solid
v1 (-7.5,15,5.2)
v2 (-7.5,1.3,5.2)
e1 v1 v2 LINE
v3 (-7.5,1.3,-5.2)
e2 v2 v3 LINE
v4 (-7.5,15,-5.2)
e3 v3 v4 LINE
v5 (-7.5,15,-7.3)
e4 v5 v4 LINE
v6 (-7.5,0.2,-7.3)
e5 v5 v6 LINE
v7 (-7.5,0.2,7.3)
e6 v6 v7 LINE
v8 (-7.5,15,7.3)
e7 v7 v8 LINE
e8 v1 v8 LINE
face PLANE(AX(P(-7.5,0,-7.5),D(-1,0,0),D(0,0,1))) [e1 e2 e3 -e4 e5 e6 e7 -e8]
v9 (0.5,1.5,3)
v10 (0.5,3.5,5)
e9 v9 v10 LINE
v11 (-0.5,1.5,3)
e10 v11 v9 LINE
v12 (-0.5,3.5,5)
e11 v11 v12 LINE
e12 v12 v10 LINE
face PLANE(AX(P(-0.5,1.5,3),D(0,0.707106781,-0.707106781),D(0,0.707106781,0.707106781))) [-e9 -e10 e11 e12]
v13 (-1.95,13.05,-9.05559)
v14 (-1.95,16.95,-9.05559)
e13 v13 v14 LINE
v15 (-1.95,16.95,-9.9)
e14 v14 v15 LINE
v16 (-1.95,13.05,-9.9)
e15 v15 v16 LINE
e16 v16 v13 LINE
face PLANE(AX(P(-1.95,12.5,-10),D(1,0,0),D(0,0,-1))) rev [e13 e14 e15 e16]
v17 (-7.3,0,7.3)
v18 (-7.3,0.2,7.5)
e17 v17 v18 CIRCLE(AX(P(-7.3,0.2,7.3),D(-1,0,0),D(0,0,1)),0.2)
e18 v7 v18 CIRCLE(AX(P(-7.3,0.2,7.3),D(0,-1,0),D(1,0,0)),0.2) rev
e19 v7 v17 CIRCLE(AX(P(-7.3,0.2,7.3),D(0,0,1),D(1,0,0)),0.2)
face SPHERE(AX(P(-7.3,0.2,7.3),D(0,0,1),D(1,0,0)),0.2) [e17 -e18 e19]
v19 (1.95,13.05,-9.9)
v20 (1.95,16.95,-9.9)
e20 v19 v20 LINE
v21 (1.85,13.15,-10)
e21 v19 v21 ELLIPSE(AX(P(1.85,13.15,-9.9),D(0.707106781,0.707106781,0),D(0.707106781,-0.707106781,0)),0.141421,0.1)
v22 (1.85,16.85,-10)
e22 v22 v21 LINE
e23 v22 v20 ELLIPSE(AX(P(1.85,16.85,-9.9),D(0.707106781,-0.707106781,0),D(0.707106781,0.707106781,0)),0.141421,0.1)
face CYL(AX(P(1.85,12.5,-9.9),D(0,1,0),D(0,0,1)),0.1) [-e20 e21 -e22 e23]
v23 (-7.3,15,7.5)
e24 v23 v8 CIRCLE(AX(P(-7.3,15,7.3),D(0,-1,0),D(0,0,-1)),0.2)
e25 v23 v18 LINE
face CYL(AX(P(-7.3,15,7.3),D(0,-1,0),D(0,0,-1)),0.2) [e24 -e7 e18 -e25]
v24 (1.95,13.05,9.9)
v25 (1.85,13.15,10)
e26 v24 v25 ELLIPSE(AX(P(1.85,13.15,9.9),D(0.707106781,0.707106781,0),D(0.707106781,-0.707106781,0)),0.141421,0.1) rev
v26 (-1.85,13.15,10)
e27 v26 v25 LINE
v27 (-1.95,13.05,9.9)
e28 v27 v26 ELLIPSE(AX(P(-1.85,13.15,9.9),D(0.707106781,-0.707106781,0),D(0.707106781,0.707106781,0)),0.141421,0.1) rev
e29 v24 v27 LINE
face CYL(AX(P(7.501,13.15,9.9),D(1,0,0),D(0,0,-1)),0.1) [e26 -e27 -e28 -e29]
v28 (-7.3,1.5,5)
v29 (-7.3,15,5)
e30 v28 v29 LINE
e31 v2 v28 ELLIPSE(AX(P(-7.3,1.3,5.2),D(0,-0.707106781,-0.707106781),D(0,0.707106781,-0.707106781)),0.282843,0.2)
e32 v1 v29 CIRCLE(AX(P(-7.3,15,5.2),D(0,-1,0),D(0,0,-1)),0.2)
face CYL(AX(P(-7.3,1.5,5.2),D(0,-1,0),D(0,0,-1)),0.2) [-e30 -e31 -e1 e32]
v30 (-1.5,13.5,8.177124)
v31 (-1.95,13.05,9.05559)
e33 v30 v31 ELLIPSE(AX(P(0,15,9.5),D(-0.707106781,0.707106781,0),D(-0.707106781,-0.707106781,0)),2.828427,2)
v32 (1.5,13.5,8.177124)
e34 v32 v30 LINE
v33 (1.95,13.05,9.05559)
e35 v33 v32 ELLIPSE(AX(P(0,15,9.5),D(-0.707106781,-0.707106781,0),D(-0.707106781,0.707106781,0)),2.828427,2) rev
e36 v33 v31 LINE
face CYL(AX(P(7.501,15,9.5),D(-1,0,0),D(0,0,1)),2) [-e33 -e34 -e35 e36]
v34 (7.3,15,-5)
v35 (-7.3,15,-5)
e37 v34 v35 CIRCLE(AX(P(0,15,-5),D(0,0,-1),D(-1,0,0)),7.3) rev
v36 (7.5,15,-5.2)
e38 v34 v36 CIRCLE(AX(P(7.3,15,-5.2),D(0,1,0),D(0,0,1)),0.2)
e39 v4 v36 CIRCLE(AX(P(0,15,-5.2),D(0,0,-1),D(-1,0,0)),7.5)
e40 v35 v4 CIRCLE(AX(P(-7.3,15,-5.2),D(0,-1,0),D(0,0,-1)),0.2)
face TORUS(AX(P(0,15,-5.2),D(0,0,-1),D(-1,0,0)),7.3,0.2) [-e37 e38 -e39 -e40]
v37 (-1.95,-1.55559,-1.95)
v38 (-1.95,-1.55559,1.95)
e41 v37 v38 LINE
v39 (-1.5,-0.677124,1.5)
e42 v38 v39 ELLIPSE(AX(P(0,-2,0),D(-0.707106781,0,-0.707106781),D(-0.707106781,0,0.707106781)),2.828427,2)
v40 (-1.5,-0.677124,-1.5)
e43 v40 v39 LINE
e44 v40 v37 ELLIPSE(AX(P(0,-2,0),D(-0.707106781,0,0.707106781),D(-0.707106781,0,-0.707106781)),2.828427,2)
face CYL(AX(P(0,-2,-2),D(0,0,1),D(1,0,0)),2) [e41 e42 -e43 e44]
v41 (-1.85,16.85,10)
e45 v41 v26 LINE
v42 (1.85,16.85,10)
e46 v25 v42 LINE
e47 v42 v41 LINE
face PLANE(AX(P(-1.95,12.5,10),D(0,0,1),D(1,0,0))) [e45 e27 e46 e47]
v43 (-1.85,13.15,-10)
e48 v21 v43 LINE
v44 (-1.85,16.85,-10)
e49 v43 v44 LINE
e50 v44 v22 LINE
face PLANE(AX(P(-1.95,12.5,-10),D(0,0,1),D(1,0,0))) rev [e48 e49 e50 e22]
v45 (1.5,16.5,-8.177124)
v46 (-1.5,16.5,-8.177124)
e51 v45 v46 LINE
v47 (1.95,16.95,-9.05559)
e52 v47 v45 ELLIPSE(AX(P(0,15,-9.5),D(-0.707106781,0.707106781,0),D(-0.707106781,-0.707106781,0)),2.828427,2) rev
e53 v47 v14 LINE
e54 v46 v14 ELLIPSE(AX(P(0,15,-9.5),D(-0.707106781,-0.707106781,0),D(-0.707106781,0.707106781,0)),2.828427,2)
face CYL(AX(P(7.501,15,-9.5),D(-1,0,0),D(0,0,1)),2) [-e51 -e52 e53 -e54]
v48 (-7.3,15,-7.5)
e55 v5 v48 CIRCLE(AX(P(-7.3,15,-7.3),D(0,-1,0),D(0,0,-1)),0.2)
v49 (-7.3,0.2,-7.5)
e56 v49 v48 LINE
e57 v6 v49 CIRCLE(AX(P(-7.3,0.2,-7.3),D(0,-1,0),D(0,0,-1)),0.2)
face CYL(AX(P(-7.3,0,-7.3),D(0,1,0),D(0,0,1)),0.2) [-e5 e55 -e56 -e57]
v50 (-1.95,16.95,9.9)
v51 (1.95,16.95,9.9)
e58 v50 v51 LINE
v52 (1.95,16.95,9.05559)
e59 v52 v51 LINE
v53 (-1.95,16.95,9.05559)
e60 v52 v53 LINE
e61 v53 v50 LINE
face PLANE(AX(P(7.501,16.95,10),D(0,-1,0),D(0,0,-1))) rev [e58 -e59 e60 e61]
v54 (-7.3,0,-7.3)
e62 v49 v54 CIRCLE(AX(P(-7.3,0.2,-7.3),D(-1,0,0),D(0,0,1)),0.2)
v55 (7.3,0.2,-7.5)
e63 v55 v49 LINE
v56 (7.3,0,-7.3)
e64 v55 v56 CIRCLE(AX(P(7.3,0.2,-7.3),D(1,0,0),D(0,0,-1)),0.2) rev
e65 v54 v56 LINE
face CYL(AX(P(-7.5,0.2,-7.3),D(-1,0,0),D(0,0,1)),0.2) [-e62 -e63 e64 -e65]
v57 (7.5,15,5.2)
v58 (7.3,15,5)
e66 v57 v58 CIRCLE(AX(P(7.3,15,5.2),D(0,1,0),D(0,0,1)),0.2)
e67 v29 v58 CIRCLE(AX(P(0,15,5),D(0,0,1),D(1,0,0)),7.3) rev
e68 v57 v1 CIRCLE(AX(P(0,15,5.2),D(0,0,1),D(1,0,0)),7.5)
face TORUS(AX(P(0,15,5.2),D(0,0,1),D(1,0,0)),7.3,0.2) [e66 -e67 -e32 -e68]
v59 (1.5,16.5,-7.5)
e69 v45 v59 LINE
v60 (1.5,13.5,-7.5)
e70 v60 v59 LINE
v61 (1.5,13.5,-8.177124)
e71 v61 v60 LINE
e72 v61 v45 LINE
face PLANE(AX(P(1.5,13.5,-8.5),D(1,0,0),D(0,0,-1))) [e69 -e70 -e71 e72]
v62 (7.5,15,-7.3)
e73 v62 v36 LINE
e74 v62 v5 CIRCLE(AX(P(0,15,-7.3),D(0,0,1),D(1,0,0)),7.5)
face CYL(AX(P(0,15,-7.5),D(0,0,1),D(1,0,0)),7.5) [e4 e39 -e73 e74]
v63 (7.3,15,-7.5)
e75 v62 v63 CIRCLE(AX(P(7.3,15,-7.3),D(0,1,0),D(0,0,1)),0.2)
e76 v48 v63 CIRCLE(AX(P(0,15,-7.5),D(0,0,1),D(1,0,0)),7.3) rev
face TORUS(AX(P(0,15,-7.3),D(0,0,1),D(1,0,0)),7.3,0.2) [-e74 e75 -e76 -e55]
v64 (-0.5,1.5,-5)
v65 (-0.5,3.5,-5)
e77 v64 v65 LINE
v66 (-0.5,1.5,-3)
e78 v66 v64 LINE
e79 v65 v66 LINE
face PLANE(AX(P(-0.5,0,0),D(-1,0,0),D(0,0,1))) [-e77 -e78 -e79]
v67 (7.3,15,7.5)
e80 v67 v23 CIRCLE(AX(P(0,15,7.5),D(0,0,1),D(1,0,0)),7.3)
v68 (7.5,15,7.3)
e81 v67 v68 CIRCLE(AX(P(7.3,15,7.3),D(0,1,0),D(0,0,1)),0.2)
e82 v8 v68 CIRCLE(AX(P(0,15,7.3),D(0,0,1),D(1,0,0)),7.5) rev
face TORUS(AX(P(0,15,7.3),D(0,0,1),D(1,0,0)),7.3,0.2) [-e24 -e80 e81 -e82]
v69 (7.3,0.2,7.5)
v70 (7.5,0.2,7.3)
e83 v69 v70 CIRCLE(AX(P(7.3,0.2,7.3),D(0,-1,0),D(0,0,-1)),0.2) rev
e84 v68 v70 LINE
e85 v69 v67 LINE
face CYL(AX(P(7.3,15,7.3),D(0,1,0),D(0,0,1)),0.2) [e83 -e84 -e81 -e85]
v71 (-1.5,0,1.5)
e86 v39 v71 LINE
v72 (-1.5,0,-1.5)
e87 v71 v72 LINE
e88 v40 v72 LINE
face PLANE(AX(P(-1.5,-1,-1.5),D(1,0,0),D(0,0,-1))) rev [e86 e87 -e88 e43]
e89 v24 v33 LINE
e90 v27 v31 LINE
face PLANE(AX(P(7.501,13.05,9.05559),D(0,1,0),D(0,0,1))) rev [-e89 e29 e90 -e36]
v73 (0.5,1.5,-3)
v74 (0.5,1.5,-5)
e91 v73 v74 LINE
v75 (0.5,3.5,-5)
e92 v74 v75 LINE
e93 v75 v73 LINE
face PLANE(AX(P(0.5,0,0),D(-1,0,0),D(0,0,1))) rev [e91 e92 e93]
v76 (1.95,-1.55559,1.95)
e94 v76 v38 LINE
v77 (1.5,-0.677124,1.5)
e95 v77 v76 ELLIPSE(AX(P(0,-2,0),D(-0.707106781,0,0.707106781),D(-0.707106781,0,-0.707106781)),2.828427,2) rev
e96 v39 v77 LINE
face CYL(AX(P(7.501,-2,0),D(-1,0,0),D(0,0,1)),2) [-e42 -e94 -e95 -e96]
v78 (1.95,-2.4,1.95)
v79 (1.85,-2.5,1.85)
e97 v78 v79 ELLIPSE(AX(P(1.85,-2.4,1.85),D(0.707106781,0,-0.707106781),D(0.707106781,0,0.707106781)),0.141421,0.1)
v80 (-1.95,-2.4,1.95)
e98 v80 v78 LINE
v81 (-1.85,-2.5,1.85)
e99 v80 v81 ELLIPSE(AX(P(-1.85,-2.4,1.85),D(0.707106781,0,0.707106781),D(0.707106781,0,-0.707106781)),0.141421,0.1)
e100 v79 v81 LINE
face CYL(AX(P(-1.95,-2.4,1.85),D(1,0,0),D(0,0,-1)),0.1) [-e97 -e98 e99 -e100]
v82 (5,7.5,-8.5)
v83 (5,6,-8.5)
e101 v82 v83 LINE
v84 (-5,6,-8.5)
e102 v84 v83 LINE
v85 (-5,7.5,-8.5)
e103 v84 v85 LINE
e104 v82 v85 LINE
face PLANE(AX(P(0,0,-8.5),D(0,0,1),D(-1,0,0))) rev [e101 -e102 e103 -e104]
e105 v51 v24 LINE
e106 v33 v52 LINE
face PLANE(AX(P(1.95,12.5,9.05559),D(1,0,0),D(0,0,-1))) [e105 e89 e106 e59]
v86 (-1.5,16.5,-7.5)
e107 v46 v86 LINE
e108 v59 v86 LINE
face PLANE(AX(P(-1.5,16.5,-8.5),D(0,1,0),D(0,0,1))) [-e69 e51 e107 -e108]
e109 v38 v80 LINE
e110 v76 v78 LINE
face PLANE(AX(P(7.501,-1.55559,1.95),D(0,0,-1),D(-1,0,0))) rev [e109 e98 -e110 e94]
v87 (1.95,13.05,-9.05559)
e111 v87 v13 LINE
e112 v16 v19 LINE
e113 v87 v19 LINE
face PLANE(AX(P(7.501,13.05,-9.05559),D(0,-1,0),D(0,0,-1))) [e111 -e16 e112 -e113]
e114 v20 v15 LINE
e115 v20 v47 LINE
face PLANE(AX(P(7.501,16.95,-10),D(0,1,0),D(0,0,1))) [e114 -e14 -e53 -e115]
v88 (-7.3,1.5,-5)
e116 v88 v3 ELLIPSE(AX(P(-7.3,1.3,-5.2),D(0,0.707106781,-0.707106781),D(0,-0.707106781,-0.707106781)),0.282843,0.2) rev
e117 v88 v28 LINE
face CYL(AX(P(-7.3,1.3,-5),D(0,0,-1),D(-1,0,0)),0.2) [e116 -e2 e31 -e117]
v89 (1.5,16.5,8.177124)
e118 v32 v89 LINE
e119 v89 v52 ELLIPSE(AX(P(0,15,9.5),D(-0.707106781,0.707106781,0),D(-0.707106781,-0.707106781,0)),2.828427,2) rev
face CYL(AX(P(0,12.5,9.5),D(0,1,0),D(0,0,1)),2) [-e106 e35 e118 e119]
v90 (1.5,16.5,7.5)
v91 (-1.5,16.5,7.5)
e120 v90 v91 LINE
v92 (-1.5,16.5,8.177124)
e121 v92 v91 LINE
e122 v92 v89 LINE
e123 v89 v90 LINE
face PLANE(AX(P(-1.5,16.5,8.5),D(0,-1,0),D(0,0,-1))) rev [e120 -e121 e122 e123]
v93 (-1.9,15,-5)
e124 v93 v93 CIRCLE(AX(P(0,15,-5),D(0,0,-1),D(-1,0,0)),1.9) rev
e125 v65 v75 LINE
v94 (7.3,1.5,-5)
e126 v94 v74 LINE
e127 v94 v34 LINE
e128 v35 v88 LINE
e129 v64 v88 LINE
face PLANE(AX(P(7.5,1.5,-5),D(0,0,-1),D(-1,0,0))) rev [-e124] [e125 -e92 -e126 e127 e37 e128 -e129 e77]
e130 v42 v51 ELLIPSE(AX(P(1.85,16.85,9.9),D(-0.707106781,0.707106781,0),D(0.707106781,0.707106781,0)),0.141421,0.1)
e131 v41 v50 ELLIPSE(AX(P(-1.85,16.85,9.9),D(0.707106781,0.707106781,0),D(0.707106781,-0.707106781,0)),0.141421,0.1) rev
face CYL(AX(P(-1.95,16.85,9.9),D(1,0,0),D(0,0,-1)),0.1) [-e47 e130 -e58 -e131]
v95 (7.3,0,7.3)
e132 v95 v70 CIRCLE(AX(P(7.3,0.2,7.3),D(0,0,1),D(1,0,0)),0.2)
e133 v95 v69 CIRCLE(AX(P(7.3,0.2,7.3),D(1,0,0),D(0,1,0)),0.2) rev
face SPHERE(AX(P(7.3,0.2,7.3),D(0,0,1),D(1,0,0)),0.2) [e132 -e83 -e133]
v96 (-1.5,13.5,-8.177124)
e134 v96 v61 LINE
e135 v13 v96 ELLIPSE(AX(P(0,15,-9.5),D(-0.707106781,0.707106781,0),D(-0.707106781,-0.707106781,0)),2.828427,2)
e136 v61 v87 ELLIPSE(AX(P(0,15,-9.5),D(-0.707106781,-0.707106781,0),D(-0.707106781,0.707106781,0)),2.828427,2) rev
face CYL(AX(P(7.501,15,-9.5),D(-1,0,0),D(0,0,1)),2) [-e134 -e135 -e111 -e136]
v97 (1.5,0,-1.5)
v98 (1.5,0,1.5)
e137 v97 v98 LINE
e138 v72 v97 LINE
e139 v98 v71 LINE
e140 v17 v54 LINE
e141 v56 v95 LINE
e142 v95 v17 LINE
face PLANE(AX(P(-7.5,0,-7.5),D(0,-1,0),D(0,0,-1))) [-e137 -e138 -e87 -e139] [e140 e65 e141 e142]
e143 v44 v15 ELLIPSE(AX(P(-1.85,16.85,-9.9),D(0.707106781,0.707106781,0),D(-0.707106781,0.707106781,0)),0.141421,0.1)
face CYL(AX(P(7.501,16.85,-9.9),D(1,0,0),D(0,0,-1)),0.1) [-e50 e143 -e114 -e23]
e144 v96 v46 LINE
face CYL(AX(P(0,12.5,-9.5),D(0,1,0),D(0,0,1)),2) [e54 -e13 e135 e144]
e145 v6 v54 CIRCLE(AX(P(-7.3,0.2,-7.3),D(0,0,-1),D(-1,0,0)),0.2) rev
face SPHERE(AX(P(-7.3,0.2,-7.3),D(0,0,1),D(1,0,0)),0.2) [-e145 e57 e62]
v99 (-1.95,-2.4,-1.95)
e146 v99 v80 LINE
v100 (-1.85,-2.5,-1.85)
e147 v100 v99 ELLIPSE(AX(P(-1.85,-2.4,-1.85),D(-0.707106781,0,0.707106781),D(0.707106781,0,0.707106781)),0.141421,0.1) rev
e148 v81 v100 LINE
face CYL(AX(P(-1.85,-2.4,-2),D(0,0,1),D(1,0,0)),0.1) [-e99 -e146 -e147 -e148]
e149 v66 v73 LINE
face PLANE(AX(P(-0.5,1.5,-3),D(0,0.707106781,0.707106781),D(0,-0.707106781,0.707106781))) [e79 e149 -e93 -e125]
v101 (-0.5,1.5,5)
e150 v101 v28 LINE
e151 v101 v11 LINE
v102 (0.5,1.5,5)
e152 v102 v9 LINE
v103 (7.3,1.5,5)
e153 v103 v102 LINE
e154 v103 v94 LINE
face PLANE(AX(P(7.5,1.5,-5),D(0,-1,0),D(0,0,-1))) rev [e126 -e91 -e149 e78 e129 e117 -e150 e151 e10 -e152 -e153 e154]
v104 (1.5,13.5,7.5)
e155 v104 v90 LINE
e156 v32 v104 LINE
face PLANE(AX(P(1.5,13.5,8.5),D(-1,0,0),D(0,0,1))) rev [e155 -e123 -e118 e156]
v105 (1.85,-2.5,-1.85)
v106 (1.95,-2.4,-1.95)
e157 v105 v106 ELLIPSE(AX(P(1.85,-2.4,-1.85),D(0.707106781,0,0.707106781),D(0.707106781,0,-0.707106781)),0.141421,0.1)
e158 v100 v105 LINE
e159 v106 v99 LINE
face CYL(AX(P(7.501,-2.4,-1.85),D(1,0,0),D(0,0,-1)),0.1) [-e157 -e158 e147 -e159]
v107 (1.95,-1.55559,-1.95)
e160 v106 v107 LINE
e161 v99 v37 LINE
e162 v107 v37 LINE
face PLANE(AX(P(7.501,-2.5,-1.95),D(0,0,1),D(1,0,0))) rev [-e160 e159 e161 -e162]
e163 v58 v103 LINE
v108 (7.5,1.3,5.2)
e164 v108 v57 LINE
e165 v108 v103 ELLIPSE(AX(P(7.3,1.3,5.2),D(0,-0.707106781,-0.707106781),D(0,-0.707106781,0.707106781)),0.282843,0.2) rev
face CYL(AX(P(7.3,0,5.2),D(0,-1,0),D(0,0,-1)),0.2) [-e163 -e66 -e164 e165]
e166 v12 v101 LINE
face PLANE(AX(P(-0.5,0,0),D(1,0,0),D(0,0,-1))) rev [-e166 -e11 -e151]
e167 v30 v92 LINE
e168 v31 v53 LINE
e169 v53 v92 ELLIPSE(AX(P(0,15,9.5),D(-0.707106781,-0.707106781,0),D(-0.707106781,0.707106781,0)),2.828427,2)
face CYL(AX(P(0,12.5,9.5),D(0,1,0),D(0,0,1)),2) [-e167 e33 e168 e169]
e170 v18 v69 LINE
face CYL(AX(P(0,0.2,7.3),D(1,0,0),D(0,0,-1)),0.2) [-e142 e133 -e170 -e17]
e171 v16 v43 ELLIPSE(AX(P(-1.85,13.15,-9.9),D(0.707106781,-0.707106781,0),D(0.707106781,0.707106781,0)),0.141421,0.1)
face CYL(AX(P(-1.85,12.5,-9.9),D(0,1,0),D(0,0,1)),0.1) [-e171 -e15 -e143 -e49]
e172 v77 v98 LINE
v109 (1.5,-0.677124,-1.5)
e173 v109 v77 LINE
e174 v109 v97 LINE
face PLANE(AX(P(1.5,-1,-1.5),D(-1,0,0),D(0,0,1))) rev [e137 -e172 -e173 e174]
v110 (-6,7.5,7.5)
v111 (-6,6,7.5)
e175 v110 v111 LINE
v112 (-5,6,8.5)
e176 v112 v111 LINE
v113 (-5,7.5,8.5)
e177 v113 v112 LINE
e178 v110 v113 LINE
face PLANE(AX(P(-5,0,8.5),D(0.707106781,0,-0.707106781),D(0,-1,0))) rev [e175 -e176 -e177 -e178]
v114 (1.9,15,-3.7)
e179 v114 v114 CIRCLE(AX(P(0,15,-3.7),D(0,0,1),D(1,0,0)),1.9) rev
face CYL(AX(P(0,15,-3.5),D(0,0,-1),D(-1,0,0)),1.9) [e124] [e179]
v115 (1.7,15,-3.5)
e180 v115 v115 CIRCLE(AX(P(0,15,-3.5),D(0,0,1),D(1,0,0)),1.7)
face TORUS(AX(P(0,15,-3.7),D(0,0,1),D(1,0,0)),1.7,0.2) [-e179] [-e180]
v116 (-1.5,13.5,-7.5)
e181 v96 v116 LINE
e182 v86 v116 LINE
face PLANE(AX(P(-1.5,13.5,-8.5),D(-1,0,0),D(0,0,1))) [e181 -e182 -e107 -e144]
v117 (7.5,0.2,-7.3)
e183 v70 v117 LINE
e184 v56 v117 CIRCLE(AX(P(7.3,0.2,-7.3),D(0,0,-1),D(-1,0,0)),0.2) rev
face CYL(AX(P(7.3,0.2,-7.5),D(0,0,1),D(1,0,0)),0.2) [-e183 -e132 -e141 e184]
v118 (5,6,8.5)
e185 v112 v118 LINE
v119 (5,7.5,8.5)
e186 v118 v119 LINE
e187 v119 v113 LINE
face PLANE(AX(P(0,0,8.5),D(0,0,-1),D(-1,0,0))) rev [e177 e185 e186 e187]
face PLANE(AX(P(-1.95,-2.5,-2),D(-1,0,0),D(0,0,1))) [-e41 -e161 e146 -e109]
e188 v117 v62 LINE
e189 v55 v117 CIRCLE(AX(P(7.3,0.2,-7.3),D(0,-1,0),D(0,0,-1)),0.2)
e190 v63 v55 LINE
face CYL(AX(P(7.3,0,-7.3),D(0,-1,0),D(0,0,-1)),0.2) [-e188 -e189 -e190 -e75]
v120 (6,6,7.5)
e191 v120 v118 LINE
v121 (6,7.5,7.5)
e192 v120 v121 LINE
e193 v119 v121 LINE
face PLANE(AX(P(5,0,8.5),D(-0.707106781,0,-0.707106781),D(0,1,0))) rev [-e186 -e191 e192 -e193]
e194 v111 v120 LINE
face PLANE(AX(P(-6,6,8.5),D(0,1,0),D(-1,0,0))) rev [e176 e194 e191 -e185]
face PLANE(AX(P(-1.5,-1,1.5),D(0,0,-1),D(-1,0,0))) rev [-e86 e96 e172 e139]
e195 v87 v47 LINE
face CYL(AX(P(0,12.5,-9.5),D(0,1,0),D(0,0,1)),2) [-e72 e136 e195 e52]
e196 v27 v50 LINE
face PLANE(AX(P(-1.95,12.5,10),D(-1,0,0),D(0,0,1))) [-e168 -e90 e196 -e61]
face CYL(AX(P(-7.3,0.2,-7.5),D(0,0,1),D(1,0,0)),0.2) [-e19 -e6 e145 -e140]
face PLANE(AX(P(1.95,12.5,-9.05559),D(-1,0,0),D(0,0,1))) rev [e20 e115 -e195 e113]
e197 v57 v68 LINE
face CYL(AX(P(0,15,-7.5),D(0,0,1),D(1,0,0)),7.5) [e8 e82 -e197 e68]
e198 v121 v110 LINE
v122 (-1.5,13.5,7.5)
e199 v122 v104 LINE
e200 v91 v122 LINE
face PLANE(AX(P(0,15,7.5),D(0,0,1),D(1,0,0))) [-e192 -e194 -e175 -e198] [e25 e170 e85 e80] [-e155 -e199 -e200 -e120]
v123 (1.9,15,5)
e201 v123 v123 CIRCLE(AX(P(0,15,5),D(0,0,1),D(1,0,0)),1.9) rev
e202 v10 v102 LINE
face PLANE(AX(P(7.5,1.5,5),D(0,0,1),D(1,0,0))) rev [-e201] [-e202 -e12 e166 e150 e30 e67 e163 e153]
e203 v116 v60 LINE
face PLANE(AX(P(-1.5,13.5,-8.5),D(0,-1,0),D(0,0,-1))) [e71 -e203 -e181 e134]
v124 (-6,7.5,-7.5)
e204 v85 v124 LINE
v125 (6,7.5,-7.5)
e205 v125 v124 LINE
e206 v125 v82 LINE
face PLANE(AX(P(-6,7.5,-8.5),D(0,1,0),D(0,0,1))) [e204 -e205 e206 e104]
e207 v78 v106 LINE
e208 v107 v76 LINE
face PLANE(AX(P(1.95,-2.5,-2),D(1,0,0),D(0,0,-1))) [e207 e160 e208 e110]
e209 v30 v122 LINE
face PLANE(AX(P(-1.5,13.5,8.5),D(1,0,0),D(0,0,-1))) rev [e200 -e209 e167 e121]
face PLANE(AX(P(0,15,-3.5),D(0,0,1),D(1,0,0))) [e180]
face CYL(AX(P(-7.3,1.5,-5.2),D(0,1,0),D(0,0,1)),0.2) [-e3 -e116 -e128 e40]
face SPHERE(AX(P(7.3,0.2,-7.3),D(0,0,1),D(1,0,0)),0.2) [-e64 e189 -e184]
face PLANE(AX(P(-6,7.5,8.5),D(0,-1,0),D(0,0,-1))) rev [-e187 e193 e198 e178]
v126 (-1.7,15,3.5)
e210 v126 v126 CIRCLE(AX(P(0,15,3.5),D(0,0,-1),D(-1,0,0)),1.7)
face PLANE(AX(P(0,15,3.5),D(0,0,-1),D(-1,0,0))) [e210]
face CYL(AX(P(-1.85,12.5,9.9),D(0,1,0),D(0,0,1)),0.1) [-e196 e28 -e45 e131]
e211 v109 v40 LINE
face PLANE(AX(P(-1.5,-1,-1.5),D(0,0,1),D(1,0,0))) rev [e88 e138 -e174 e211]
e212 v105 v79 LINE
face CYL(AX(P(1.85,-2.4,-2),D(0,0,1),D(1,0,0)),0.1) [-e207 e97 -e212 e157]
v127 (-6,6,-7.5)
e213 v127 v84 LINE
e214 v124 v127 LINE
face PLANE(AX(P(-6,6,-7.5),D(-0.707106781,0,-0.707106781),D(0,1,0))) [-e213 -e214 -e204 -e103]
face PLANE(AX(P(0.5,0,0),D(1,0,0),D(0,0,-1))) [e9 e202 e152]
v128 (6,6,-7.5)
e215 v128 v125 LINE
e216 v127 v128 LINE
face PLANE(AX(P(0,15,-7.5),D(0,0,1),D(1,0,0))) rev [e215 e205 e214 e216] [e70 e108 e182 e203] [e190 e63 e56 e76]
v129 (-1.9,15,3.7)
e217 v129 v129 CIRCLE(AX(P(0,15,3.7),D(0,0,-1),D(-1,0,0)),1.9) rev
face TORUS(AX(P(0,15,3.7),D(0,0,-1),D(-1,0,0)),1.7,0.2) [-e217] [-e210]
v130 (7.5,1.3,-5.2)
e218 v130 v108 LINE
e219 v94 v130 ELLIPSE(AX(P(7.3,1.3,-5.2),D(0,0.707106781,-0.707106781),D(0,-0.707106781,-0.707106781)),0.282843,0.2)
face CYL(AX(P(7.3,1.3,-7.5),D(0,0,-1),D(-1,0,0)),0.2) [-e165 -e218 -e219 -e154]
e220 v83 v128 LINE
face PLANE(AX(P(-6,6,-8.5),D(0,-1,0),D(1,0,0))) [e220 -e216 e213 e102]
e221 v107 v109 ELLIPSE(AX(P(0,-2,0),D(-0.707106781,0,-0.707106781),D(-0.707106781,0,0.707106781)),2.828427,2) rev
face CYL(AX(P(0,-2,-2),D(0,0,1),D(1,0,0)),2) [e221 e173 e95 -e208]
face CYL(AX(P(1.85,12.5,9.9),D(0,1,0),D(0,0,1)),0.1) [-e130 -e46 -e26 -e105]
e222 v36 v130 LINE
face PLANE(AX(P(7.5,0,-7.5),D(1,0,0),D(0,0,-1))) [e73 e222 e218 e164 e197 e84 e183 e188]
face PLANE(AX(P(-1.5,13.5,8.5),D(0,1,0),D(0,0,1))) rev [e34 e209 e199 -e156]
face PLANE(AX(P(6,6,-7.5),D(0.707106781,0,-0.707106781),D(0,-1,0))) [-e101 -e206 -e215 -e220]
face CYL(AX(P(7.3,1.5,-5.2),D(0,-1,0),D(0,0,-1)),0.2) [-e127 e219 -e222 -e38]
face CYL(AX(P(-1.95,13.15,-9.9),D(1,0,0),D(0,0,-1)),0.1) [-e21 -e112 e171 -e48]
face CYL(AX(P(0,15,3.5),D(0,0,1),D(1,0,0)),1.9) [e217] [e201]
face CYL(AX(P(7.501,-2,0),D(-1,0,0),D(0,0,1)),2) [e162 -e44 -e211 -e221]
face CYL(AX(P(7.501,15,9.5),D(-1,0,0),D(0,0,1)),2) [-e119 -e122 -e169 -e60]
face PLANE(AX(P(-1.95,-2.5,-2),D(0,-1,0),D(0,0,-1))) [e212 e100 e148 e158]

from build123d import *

# Parameters (mm, degrees)
EXTRUDE_1_DEPTH            = 7.5
EXTRUDE_1_DEPTH_BACK       = 7.5
SKETCH_3_W                 = 10
SKETCH_3_H                 = 21
CUT_EXTRUDE_1_DEPTH        = 29.062430401
SKETCH_4_W                 = 3
SKETCH_4_H                 = 3
EXTRUDE_2_DEPTH            = 1
EXTRUDE_3_DEPTH            = 2
EXTRUDE_3_DEPTH_BACK       = 2
CUT_EXTRUDE_2_REACH        = 27.53
SKETCH_7_W                 = 3
SKETCH_7_H                 = 3
EXTRUDE_4_DEPTH            = 1
EXTRUDE_START              = -4
EXTRUDE_5_DEPTH            = 5
CUT_EXTRUDE_3_REACH        = 28.373
SKETCH_10_R                = 1.9
EXTRUDE_6_DEPTH            = 1.5
EXTRUDE_START_2            = 1.5
SKETCH_11_R                = 1.9
EXTRUDE_7_DEPTH            = 1.5
EXTRUDE_8_DEPTH            = 0.5
EXTRUDE_8_DEPTH_BACK       = 0.5
SKETCH_13_W                = 12
SKETCH_13_H                = 1.5
EXTRUDE_9_DEPTH            = 1
CHAMFER_1_SIZE             = 1
CHAMFER_1_OF_MIRROR_2_SIZE = 1
FILLET_1_R                 = 0.1
FILLET_2_R                 = 0.2
FILLET_3_R                 = 0.2
FILLET_4_R                 = 0.1


with BuildPart() as part:
    # 草图1 → 凸台-拉伸1 (new, two sides: drawn at the far end of the back side and taken through both)
    with BuildSketch(Plane.XY.offset(-EXTRUDE_1_DEPTH_BACK)):
        with BuildLine():
            Line((-7.5, 0), (7.5, 0))
            Line((7.5, 0), (7.5, 15))
            ThreePointArc((7.5, 15), (0, 22.5), (-7.5, 15))
            Line((-7.5, 15), (-7.5, 0))
        make_face()
    extrude(amount=EXTRUDE_1_DEPTH + EXTRUDE_1_DEPTH_BACK)

    # 草图3 → 切除-拉伸1 (cut, through all)
    with BuildSketch(Plane.ZY.offset(7.5)):
        with Locations((0, 12)):
            Rectangle(SKETCH_3_W, SKETCH_3_H)
    extrude(amount=-CUT_EXTRUDE_1_DEPTH, mode=Mode.SUBTRACT)

    # 草图4 → 凸台-拉伸2 (add)
    with BuildSketch(Plane(origin=(0, 0, 0), x_dir=(-1, 0, 0), z_dir=(0, -1, 0))):
        Rectangle(SKETCH_4_W, SKETCH_4_H)
    extrude(amount=EXTRUDE_2_DEPTH)

    # 草图5 → 凸台-拉伸3 (add, two sides: drawn at the far end of the back side and taken through both)
    with BuildSketch(Plane.XY.offset(-EXTRUDE_3_DEPTH_BACK)):
        with BuildLine():
            Line((-1.95, -2.5), (1.95, -2.5))
            Line((1.95, -2.5), (1.95, -1.555590279))
            ThreePointArc((1.95, -1.555590279), (1.780042303, -1.088161527), (1.5, -0.677124344))
            Line((1.5, -0.677124344), (-1.5, -0.677124344))
            ThreePointArc((-1.5, -0.677124344), (-1.780042303, -1.088161527), (-1.95, -1.555590279))
            Line((-1.95, -1.555590279), (-1.95, -2.5))
        make_face()
    extrude(amount=EXTRUDE_3_DEPTH + EXTRUDE_3_DEPTH_BACK)

    # 草图6 → 切除-拉伸2 (cut, up to next)
    with BuildSketch(Plane.ZY.offset(1.95), mode=Mode.PRIVATE) as cut_extrude_2_sk1:
        with BuildLine():
            Line((-1.95, -2.5), (-1.95, -1.555590279))
            ThreePointArc((-1.95, -1.555590279), (-1.780042303, -1.088161527), (-1.5, -0.677124344))
            Line((-1.5, -0.677124344), (-2, -0.677124344))
            Line((-2, -0.677124344), (-2, -2.5))
            Line((-2, -2.5), (-1.95, -2.5))
        make_face()
    cut_extrude_2_tool1 = extrude(cut_extrude_2_sk1.sketch, amount=-CUT_EXTRUDE_2_REACH, mode=Mode.PRIVATE) & part.part
    # 草图6 → 切除-拉伸2 (cut, up to next)
    with BuildSketch(Plane.ZY.offset(1.95), mode=Mode.PRIVATE) as cut_extrude_2_sk2:
        with BuildLine():
            Line((2, -2.5), (2, -0.677124344))
            Line((2, -0.677124344), (1.5, -0.677124344))
            ThreePointArc((1.5, -0.677124344), (1.780042303, -1.088161527), (1.95, -1.555590279))
            Line((1.95, -1.555590279), (1.95, -2.5))
            Line((1.95, -2.5), (2, -2.5))
        make_face()
    cut_extrude_2_tool2 = extrude(cut_extrude_2_sk2.sketch, amount=-CUT_EXTRUDE_2_REACH, mode=Mode.PRIVATE) & part.part
    add(cut_extrude_2_tool1.solids().sort_by_distance((-1.95, -1.175075, -1.873038))[0], mode=Mode.SUBTRACT)
    add(cut_extrude_2_tool2.solids().sort_by_distance((-1.95, -1.175075, 1.873038))[0], mode=Mode.SUBTRACT)

    # 草图7 → 凸台-拉伸4 (add)
    with BuildSketch(Plane.XY.offset(7.5)):
        with Locations((0, 15)):
            Rectangle(SKETCH_7_W, SKETCH_7_H)
    extrude_4 = extrude(amount=EXTRUDE_4_DEPTH)

    # 草图8 → 凸台-拉伸5 (add)
    with BuildSketch(Plane(origin=(0, 16.5, 0), x_dir=(1, 0, 0), z_dir=(0, 1, 0)).offset(EXTRUDE_START)):
        with BuildLine():
            Line((-1.95, -10), (1.95, -10))
            Line((1.95, -10), (1.95, -9.055590279))
            ThreePointArc((1.95, -9.055590279), (1.780042303, -8.588161527), (1.5, -8.177124344))
            Line((1.5, -8.177124344), (-1.5, -8.177124344))
            ThreePointArc((-1.5, -8.177124344), (-1.780042303, -8.588161527), (-1.95, -9.055590279))
            Line((-1.95, -9.055590279), (-1.95, -10))
        make_face()
    extrude_5 = extrude(amount=EXTRUDE_5_DEPTH)

    # 草图9 → 切除-拉伸3 (cut, up to next)
    with BuildSketch(Plane.ZY.offset(1.95), mode=Mode.PRIVATE) as cut_extrude_3_sk1:
        with BuildLine():
            Line((10, 16.95), (9.055590279, 16.95))
            ThreePointArc((9.055590279, 16.95), (8.588161527, 16.780042303), (8.177124344, 16.5))
            Line((8.177124344, 16.5), (8.177124344, 17.5))
            Line((8.177124344, 17.5), (10, 17.5))
            Line((10, 17.5), (10, 16.95))
        make_face()
    cut_extrude_3_tool1 = extrude(cut_extrude_3_sk1.sketch, amount=-CUT_EXTRUDE_3_REACH, mode=Mode.PRIVATE) & part.part
    # 草图9 → 切除-拉伸3 (cut, up to next)
    with BuildSketch(Plane.ZY.offset(1.95), mode=Mode.PRIVATE) as cut_extrude_3_sk2:
        with BuildLine():
            Line((10, 12.5), (8.177124344, 12.5))
            Line((8.177124344, 12.5), (8.177124344, 13.5))
            ThreePointArc((8.177124344, 13.5), (8.588161527, 13.219957697), (9.055590279, 13.05))
            Line((9.055590279, 13.05), (10, 13.05))
            Line((10, 13.05), (10, 12.5))
        make_face()
    cut_extrude_3_tool2 = extrude(cut_extrude_3_sk2.sketch, amount=-CUT_EXTRUDE_3_REACH, mode=Mode.PRIVATE) & part.part
    cut_extrude_3_1 = cut_extrude_3_tool1.solids().sort_by_distance((-1.95, 17.169375, 9.000125))[0]
    add(cut_extrude_3_1, mode=Mode.SUBTRACT)
    cut_extrude_3_2 = cut_extrude_3_tool2.solids().sort_by_distance((-1.95, 12.830625, 9.000125))[0]
    add(cut_extrude_3_2, mode=Mode.SUBTRACT)
    cut_extrude_3 = cut_extrude_3_1 + cut_extrude_3_2  # 切除-拉伸3 as one shape, for the pattern or mirror that repeats it

    # 草图10 → 凸台-拉伸6 (add)
    with BuildSketch(Plane.XY.offset(-5)):
        with Locations(Location((0, 15, 0), (0, 0, 180))):
            Circle(SKETCH_10_R)
    extrude(amount=EXTRUDE_6_DEPTH)

    # 草图11 → 凸台-拉伸7 (add)
    with BuildSketch(Plane(origin=(0, 0, 5), x_dir=(-1, 0, 0), z_dir=(0, 0, -1)).offset(EXTRUDE_START_2)):
        with Locations((0, 15)):
            Circle(SKETCH_11_R)
    extrude(amount=-EXTRUDE_7_DEPTH)

    # 镜向1: 凸台-拉伸4, 凸台-拉伸5, 切除-拉伸3 across plane
    add(extrude_4.mirror(Plane.XY))
    add(extrude_5.mirror(Plane.XY))
    add(cut_extrude_3.mirror(Plane.XY), mode=Mode.SUBTRACT)

    # 草图12 → 凸台-拉伸8 (add, two sides: drawn at the far end of the back side and taken through both)
    with BuildSketch(Plane(origin=(0, 0, 0), x_dir=(0, 0, -1), z_dir=(1, 0, 0)).offset(-EXTRUDE_8_DEPTH_BACK)):
        Polygon((5, 1.5), (3, 1.5), (5, 3.5), align=None)
        Polygon((-5, 1.5), (-3, 1.5), (-5, 3.5), align=None)
    extrude(amount=EXTRUDE_8_DEPTH + EXTRUDE_8_DEPTH_BACK)

    # 草图13 → 凸台-拉伸9 (add)
    with BuildSketch(Plane.XY.offset(7.5)):
        with Locations((0, 6.75)):
            Rectangle(SKETCH_13_W, SKETCH_13_H)
    extrude_9 = extrude(amount=EXTRUDE_9_DEPTH)

    # 倒角1
    chamfer_1_edges = [part.edges().sort_by_distance(p)[0] for p in [
        (-6, 6.75, 8.5),
        (6, 6.75, 8.5),
    ]]
    chamfer(chamfer_1_edges, length=CHAMFER_1_SIZE - 0.0001)  # a hair under: the kernel refuses the full size

    # 镜向2: 凸台-拉伸9 across plane
    add(extrude_9.mirror(Plane.XY))

    # 倒角1 of 镜向2
    chamfer_1_of_mirror_2_edges = [part.edges().sort_by_distance(p)[0] for p in [
        (-6, 6.75, -8.5),
        (6, 6.75, -8.5),
    ]]
    chamfer(chamfer_1_of_mirror_2_edges, length=CHAMFER_1_OF_MIRROR_2_SIZE - 0.0001)  # a hair under: the kernel refuses the full size

    # 圆角1
    fillet_1_edges = [part.edges().sort_by_distance(p)[0] for p in [
        (0, 16.95, 10),
        (-1.95, 15, 10),
        (1.95, 15, 10),
        (0, 13.05, 10),
        (0, 16.95, -10),
        (1.95, 15, -10),
        (-1.95, 15, -10),
        (0, 13.05, -10),
    ]]
    fillet(fillet_1_edges, radius=FILLET_1_R)

    # 圆角2
    fillet_2_edges = [part.edges().sort_by_distance(p)[0] for p in [
        (7.5, 7.5, -7.5),
        (-7.5, 7.5, 7.5),
        (0, 0, 7.5),
        (0, 22.5, -7.5),
        (7.5, 7.5, 7.5),
        (0, 22.5, 7.5),
        (7.5, 8.25, -5),
        (0, 22.5, -5),
        (0, 22.5, 5),
        (7.5, 8.25, 5),
        (7.5, 1.5, 0),
        (-7.5, 8.25, 5),
        (-7.5, 8.25, -5),
        (-7.5, 1.5, 0),
        (-7.5, 7.5, -7.5),
        (0, 0, -7.5),
        (7.5, 0, 0),
        (-7.5, 0, 0),
    ]]
    fillet(fillet_2_edges, radius=FILLET_2_R)

    # 圆角3
    fillet_3_edges = [part.edges().sort_by_distance(p)[0] for p in [
        (1.9, 15, -3.5),
        (1.9, 15, 3.5),
    ]]
    fillet(fillet_3_edges, radius=FILLET_3_R)

    # 圆角4
    fillet_4_edges = [part.edges().sort_by_distance(p)[0] for p in [
        (1.95, -2.5, 0),
        (-1.95, -2.5, 0),
        (0, -2.5, -1.95),
        (0, -2.5, 1.95),
    ]]
    fillet(fillet_4_edges, radius=FILLET_4_R)


solid = part.part
